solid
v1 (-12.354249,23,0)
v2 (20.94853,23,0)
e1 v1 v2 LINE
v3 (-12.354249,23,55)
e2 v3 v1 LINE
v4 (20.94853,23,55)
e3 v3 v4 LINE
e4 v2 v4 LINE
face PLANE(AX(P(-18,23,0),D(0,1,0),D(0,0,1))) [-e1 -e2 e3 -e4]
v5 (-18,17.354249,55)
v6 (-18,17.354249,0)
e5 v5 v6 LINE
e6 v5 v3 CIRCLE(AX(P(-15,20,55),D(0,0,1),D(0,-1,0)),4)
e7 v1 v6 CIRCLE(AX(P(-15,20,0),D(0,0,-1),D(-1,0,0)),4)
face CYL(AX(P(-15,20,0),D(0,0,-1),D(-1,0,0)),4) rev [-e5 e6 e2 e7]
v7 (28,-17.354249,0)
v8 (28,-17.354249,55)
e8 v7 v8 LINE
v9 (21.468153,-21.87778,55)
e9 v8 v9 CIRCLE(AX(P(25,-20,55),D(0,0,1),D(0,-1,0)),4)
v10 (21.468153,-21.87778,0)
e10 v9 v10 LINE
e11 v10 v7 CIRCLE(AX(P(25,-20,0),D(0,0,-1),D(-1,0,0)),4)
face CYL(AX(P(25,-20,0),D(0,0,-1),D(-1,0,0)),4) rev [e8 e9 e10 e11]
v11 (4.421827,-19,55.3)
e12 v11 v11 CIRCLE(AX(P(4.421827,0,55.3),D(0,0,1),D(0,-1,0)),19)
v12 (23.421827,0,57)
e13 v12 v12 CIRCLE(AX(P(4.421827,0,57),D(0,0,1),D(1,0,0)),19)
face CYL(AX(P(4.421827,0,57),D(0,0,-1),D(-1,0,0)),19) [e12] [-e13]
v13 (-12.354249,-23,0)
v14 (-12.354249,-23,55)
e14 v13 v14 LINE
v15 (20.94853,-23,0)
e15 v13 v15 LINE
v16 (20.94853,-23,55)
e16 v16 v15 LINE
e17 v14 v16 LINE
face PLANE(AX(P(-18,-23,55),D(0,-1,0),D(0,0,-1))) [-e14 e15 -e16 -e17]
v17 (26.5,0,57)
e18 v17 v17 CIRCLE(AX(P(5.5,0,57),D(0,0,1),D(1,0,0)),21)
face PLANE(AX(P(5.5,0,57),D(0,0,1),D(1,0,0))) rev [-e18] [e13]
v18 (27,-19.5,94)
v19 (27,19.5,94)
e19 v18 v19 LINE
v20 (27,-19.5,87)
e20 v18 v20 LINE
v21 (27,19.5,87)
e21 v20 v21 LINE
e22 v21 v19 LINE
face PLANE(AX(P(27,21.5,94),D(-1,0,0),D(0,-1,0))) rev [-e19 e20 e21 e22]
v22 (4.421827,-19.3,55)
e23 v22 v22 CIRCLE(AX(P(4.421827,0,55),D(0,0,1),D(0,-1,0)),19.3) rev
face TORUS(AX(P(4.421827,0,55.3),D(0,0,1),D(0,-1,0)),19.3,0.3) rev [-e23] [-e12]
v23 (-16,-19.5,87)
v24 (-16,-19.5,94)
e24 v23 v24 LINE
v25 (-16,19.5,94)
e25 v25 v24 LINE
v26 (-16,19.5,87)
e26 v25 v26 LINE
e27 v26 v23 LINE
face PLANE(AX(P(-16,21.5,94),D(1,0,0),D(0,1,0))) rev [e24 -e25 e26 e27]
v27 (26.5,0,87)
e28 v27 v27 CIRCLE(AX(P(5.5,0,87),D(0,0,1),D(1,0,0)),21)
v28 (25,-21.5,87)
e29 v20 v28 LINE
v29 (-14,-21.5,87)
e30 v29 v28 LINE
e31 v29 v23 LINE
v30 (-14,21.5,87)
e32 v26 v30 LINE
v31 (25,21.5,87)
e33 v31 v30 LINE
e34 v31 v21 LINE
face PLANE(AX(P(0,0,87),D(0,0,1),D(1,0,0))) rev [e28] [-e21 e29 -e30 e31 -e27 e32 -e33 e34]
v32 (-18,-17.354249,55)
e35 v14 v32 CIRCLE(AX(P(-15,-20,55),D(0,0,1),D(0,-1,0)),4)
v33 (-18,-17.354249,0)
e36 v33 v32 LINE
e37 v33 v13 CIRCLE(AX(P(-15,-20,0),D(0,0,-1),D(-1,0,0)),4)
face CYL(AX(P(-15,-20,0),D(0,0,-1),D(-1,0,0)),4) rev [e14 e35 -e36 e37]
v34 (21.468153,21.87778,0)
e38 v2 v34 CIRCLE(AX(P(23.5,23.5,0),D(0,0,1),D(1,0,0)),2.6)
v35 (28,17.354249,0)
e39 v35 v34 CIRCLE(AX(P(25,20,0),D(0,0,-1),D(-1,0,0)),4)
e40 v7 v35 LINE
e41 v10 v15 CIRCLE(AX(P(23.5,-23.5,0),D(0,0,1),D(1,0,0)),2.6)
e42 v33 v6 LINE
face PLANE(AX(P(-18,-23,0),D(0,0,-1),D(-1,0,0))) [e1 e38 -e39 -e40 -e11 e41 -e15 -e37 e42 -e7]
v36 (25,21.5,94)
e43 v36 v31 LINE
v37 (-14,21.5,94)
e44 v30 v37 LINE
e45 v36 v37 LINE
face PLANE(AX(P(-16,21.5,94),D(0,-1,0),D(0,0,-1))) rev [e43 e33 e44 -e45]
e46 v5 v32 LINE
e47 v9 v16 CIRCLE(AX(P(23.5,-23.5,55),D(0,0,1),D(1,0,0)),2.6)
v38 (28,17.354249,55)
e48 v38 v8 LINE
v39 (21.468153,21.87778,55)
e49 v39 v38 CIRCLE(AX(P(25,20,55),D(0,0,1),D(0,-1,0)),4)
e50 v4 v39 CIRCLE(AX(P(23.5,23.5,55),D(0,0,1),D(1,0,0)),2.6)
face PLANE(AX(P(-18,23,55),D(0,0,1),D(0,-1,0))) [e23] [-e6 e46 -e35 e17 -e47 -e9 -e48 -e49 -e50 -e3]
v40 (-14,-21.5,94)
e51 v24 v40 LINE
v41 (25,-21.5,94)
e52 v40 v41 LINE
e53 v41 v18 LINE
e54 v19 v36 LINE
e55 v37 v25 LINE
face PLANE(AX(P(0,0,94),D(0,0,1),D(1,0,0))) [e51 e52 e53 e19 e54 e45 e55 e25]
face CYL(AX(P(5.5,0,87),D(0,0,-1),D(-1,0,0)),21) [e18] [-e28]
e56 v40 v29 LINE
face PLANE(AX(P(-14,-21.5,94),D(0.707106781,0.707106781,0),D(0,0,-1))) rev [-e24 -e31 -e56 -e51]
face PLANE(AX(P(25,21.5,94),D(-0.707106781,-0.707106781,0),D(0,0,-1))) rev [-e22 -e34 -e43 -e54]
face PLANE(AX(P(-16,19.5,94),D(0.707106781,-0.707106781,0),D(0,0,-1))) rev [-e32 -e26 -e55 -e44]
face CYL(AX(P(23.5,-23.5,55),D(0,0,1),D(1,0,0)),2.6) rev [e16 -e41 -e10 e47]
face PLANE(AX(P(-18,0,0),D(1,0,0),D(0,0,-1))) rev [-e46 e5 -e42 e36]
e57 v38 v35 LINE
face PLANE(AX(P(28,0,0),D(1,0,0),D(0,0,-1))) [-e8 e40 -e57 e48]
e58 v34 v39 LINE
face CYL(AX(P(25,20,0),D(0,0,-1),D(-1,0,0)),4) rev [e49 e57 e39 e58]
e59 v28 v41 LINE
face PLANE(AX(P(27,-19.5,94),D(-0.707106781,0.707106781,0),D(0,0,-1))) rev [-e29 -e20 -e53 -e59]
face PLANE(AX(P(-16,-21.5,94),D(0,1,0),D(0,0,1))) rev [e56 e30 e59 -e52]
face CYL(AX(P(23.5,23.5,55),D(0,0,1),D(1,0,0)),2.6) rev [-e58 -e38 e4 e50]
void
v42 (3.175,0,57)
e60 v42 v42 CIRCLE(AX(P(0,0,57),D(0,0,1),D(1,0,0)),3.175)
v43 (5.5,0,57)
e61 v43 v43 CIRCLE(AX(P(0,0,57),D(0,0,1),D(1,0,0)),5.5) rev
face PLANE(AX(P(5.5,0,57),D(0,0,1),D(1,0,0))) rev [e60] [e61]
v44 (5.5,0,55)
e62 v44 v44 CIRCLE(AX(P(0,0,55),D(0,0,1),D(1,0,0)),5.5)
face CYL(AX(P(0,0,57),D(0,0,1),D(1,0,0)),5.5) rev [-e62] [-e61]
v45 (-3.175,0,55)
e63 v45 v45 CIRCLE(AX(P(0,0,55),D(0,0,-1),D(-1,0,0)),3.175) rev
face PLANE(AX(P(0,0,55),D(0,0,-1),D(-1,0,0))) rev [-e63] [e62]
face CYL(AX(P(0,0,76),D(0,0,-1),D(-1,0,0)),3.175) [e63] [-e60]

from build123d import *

# Parameters (mm, degrees)
SKETCH_1_W                  = 55
SKETCH_1_H                  = 46
EXTRUDE_1_DEPTH             = 46
SKETCH_2_R                  = 19
EXTRUDE_2_DEPTH             = 2
FILLET_1_R                  = 0.3
HOLE_WIZARD_11_0_11_1_D     = 11
HOLE_WIZARD_11_0_11_1_DEPTH = 2
SKETCH_5_R                  = 3.175
EXTRUDE_3_DEPTH             = 21
CUT_EXTRUDE_START           = -18
CUT_EXTRUDE_1_DEPTH         = 18
HOLE_WIZARD_8_0_8_1_DEPTH   = 55
HOLE_WIZARD_5_2_5_2_2_D     = 5.2
HOLE_WIZARD_5_2_5_2_2_DEPTH = 55
HOLE_WIZARD_2_0_2_1_D       = 2
HOLE_WIZARD_2_0_2_1_DEPTH   = 10
CHAMFER_1_SIZE              = 0.5
CHAMFER_2_SIZE              = 0.1
SKETCH_15_R                 = 21
EXTRUDE_4_DEPTH             = 30
SKETCH_16_W                 = 43
SKETCH_16_H                 = 43
EXTRUDE_5_DEPTH             = 7
CHAMFER_3_SIZE              = 2


# Read off the part's stored shape, not the designer's step: Ø8.0 (8) 直径孔1
with BuildPart() as part:
    # 草图1 → 凸台-拉伸1 (new body)
    with BuildSketch(Plane(origin=(28, 0, 0), x_dir=(0, 0, -1), z_dir=(1, 0, 0))):
        with Locations((-27.5, 0)):
            Rectangle(SKETCH_1_W, SKETCH_1_H)
    extrude(amount=-EXTRUDE_1_DEPTH)

    # 草图2 → 凸台-拉伸2 (add)
    with BuildSketch(Plane.XY.offset(55)):
        with Locations((4.421826919, 0)):
            Circle(SKETCH_2_R)
    extrude(amount=EXTRUDE_2_DEPTH)

    # 圆角1
    fillet_1_edges = [part.edges().sort_by_distance(p)[0] for p in [
        (-14.578173081, 0, 55),
    ]]
    fillet(fillet_1_edges, radius=FILLET_1_R)

    # Ø11.0 (11) 直径孔1
    with Locations(Plane.XY.offset(57)):
        with Locations((0, 0)):
            Hole(HOLE_WIZARD_11_0_11_1_D / 2, depth=HOLE_WIZARD_11_0_11_1_DEPTH)

    # 草图5 → 凸台-拉伸3 (add)
    with BuildSketch(Plane.XY.offset(55)):
        with Locations(Location((0, 0, 0), (0, 0, 180))):
            Circle(SKETCH_5_R)
    extrude(amount=EXTRUDE_3_DEPTH)

    # 草图6 → 切除-拉伸1 (cut)
    with BuildSketch(Plane.XY.offset(76).offset(CUT_EXTRUDE_START)):
        with BuildLine():
            Line((-2.107130751, 2.375), (2.107130751, 2.375))
            ThreePointArc((2.107130751, 2.375), (0, 3.175), (-2.107130751, 2.375))
        make_face()
    extrude(amount=CUT_EXTRUDE_1_DEPTH, mode=Mode.SUBTRACT)

    # Ø8.0 (8) 直径孔1 outline → Ø8.0 (8) 直径孔1 (cut)
    with BuildSketch(Plane.XY):
        with BuildLine():
            ThreePointArc((-12.354248689, -23), (-12.171572875, -17.171572875), (-18, -17.354248689))
            Line((-18, -17.354248689), (-18, -23))
            Line((-18, -23), (-12.354248689, -23))
        make_face()
        with BuildLine():
            Line((-18, 23), (-18, 17.354248689))
            ThreePointArc((-18, 17.354248689), (-12.171572875, 17.171572875), (-12.354248689, 23))
            Line((-12.354248689, 23), (-18, 23))
        make_face()
        with BuildLine():
            ThreePointArc((28, -17.354248689), (22.171572875, -17.171572875), (22.354248689, -23))
            Line((22.354248689, -23), (28, -23))
            Line((28, -23), (28, -17.354248689))
        make_face()
        with BuildLine():
            Line((28, 23), (22.354248689, 23))
            ThreePointArc((22.354248689, 23), (22.171572875, 17.171572875), (28, 17.354248689))
            Line((28, 17.354248689), (28, 23))
        make_face()
    extrude(amount=HOLE_WIZARD_8_0_8_1_DEPTH, mode=Mode.SUBTRACT)

    # Ø5.2 (5.2) 直径孔2
    with Locations(Plane.XY.offset(55)):
        with Locations((23.5, 23.5), (23.5, -23.5), (-23.5, 23.5)):
            Hole(HOLE_WIZARD_5_2_5_2_2_D / 2, depth=HOLE_WIZARD_5_2_5_2_2_DEPTH)

    # Ø2.0 (2) 直径孔1
    with Locations(Plane.XY.offset(76)):
        with Locations((0, 0)):
            Hole(HOLE_WIZARD_2_0_2_1_D / 2, depth=HOLE_WIZARD_2_0_2_1_DEPTH)

    # 倒角1
    chamfer_1_edges = [part.edges().sort_by_distance(p)[0] for p in [
        (1.302014759, -2.895752504, 76),
        (0, 2.375, 76),
    ]]
    chamfer(chamfer_1_edges, length=CHAMFER_1_SIZE)

    # 倒角2
    chamfer_2_edges = [part.edges().sort_by_distance(p)[0] for p in [
        (1, 0, 76),
    ]]
    chamfer(chamfer_2_edges, length=CHAMFER_2_SIZE)

    # 草图15 → 凸台-拉伸4 (add)
    with BuildSketch(Plane.XY.offset(57)):
        with Locations((5.5, 0)):
            Circle(SKETCH_15_R)
    extrude(amount=EXTRUDE_4_DEPTH)

    # 草图16 → 凸台-拉伸5 (add)
    with BuildSketch(Plane.XY.offset(87)):
        with Locations((5.5, 0)):
            Rectangle(SKETCH_16_W, SKETCH_16_H)
    extrude(amount=EXTRUDE_5_DEPTH)

    # 倒角3
    chamfer_3_edges = [part.edges().sort_by_distance(p)[0] for p in [
        (27, -21.5, 90.5),
        (27, 21.5, 90.5),
        (-16, 21.5, 90.5),
        (-16, -21.5, 90.5),
    ]]
    chamfer(chamfer_3_edges, length=CHAMFER_3_SIZE)


solid = part.part
